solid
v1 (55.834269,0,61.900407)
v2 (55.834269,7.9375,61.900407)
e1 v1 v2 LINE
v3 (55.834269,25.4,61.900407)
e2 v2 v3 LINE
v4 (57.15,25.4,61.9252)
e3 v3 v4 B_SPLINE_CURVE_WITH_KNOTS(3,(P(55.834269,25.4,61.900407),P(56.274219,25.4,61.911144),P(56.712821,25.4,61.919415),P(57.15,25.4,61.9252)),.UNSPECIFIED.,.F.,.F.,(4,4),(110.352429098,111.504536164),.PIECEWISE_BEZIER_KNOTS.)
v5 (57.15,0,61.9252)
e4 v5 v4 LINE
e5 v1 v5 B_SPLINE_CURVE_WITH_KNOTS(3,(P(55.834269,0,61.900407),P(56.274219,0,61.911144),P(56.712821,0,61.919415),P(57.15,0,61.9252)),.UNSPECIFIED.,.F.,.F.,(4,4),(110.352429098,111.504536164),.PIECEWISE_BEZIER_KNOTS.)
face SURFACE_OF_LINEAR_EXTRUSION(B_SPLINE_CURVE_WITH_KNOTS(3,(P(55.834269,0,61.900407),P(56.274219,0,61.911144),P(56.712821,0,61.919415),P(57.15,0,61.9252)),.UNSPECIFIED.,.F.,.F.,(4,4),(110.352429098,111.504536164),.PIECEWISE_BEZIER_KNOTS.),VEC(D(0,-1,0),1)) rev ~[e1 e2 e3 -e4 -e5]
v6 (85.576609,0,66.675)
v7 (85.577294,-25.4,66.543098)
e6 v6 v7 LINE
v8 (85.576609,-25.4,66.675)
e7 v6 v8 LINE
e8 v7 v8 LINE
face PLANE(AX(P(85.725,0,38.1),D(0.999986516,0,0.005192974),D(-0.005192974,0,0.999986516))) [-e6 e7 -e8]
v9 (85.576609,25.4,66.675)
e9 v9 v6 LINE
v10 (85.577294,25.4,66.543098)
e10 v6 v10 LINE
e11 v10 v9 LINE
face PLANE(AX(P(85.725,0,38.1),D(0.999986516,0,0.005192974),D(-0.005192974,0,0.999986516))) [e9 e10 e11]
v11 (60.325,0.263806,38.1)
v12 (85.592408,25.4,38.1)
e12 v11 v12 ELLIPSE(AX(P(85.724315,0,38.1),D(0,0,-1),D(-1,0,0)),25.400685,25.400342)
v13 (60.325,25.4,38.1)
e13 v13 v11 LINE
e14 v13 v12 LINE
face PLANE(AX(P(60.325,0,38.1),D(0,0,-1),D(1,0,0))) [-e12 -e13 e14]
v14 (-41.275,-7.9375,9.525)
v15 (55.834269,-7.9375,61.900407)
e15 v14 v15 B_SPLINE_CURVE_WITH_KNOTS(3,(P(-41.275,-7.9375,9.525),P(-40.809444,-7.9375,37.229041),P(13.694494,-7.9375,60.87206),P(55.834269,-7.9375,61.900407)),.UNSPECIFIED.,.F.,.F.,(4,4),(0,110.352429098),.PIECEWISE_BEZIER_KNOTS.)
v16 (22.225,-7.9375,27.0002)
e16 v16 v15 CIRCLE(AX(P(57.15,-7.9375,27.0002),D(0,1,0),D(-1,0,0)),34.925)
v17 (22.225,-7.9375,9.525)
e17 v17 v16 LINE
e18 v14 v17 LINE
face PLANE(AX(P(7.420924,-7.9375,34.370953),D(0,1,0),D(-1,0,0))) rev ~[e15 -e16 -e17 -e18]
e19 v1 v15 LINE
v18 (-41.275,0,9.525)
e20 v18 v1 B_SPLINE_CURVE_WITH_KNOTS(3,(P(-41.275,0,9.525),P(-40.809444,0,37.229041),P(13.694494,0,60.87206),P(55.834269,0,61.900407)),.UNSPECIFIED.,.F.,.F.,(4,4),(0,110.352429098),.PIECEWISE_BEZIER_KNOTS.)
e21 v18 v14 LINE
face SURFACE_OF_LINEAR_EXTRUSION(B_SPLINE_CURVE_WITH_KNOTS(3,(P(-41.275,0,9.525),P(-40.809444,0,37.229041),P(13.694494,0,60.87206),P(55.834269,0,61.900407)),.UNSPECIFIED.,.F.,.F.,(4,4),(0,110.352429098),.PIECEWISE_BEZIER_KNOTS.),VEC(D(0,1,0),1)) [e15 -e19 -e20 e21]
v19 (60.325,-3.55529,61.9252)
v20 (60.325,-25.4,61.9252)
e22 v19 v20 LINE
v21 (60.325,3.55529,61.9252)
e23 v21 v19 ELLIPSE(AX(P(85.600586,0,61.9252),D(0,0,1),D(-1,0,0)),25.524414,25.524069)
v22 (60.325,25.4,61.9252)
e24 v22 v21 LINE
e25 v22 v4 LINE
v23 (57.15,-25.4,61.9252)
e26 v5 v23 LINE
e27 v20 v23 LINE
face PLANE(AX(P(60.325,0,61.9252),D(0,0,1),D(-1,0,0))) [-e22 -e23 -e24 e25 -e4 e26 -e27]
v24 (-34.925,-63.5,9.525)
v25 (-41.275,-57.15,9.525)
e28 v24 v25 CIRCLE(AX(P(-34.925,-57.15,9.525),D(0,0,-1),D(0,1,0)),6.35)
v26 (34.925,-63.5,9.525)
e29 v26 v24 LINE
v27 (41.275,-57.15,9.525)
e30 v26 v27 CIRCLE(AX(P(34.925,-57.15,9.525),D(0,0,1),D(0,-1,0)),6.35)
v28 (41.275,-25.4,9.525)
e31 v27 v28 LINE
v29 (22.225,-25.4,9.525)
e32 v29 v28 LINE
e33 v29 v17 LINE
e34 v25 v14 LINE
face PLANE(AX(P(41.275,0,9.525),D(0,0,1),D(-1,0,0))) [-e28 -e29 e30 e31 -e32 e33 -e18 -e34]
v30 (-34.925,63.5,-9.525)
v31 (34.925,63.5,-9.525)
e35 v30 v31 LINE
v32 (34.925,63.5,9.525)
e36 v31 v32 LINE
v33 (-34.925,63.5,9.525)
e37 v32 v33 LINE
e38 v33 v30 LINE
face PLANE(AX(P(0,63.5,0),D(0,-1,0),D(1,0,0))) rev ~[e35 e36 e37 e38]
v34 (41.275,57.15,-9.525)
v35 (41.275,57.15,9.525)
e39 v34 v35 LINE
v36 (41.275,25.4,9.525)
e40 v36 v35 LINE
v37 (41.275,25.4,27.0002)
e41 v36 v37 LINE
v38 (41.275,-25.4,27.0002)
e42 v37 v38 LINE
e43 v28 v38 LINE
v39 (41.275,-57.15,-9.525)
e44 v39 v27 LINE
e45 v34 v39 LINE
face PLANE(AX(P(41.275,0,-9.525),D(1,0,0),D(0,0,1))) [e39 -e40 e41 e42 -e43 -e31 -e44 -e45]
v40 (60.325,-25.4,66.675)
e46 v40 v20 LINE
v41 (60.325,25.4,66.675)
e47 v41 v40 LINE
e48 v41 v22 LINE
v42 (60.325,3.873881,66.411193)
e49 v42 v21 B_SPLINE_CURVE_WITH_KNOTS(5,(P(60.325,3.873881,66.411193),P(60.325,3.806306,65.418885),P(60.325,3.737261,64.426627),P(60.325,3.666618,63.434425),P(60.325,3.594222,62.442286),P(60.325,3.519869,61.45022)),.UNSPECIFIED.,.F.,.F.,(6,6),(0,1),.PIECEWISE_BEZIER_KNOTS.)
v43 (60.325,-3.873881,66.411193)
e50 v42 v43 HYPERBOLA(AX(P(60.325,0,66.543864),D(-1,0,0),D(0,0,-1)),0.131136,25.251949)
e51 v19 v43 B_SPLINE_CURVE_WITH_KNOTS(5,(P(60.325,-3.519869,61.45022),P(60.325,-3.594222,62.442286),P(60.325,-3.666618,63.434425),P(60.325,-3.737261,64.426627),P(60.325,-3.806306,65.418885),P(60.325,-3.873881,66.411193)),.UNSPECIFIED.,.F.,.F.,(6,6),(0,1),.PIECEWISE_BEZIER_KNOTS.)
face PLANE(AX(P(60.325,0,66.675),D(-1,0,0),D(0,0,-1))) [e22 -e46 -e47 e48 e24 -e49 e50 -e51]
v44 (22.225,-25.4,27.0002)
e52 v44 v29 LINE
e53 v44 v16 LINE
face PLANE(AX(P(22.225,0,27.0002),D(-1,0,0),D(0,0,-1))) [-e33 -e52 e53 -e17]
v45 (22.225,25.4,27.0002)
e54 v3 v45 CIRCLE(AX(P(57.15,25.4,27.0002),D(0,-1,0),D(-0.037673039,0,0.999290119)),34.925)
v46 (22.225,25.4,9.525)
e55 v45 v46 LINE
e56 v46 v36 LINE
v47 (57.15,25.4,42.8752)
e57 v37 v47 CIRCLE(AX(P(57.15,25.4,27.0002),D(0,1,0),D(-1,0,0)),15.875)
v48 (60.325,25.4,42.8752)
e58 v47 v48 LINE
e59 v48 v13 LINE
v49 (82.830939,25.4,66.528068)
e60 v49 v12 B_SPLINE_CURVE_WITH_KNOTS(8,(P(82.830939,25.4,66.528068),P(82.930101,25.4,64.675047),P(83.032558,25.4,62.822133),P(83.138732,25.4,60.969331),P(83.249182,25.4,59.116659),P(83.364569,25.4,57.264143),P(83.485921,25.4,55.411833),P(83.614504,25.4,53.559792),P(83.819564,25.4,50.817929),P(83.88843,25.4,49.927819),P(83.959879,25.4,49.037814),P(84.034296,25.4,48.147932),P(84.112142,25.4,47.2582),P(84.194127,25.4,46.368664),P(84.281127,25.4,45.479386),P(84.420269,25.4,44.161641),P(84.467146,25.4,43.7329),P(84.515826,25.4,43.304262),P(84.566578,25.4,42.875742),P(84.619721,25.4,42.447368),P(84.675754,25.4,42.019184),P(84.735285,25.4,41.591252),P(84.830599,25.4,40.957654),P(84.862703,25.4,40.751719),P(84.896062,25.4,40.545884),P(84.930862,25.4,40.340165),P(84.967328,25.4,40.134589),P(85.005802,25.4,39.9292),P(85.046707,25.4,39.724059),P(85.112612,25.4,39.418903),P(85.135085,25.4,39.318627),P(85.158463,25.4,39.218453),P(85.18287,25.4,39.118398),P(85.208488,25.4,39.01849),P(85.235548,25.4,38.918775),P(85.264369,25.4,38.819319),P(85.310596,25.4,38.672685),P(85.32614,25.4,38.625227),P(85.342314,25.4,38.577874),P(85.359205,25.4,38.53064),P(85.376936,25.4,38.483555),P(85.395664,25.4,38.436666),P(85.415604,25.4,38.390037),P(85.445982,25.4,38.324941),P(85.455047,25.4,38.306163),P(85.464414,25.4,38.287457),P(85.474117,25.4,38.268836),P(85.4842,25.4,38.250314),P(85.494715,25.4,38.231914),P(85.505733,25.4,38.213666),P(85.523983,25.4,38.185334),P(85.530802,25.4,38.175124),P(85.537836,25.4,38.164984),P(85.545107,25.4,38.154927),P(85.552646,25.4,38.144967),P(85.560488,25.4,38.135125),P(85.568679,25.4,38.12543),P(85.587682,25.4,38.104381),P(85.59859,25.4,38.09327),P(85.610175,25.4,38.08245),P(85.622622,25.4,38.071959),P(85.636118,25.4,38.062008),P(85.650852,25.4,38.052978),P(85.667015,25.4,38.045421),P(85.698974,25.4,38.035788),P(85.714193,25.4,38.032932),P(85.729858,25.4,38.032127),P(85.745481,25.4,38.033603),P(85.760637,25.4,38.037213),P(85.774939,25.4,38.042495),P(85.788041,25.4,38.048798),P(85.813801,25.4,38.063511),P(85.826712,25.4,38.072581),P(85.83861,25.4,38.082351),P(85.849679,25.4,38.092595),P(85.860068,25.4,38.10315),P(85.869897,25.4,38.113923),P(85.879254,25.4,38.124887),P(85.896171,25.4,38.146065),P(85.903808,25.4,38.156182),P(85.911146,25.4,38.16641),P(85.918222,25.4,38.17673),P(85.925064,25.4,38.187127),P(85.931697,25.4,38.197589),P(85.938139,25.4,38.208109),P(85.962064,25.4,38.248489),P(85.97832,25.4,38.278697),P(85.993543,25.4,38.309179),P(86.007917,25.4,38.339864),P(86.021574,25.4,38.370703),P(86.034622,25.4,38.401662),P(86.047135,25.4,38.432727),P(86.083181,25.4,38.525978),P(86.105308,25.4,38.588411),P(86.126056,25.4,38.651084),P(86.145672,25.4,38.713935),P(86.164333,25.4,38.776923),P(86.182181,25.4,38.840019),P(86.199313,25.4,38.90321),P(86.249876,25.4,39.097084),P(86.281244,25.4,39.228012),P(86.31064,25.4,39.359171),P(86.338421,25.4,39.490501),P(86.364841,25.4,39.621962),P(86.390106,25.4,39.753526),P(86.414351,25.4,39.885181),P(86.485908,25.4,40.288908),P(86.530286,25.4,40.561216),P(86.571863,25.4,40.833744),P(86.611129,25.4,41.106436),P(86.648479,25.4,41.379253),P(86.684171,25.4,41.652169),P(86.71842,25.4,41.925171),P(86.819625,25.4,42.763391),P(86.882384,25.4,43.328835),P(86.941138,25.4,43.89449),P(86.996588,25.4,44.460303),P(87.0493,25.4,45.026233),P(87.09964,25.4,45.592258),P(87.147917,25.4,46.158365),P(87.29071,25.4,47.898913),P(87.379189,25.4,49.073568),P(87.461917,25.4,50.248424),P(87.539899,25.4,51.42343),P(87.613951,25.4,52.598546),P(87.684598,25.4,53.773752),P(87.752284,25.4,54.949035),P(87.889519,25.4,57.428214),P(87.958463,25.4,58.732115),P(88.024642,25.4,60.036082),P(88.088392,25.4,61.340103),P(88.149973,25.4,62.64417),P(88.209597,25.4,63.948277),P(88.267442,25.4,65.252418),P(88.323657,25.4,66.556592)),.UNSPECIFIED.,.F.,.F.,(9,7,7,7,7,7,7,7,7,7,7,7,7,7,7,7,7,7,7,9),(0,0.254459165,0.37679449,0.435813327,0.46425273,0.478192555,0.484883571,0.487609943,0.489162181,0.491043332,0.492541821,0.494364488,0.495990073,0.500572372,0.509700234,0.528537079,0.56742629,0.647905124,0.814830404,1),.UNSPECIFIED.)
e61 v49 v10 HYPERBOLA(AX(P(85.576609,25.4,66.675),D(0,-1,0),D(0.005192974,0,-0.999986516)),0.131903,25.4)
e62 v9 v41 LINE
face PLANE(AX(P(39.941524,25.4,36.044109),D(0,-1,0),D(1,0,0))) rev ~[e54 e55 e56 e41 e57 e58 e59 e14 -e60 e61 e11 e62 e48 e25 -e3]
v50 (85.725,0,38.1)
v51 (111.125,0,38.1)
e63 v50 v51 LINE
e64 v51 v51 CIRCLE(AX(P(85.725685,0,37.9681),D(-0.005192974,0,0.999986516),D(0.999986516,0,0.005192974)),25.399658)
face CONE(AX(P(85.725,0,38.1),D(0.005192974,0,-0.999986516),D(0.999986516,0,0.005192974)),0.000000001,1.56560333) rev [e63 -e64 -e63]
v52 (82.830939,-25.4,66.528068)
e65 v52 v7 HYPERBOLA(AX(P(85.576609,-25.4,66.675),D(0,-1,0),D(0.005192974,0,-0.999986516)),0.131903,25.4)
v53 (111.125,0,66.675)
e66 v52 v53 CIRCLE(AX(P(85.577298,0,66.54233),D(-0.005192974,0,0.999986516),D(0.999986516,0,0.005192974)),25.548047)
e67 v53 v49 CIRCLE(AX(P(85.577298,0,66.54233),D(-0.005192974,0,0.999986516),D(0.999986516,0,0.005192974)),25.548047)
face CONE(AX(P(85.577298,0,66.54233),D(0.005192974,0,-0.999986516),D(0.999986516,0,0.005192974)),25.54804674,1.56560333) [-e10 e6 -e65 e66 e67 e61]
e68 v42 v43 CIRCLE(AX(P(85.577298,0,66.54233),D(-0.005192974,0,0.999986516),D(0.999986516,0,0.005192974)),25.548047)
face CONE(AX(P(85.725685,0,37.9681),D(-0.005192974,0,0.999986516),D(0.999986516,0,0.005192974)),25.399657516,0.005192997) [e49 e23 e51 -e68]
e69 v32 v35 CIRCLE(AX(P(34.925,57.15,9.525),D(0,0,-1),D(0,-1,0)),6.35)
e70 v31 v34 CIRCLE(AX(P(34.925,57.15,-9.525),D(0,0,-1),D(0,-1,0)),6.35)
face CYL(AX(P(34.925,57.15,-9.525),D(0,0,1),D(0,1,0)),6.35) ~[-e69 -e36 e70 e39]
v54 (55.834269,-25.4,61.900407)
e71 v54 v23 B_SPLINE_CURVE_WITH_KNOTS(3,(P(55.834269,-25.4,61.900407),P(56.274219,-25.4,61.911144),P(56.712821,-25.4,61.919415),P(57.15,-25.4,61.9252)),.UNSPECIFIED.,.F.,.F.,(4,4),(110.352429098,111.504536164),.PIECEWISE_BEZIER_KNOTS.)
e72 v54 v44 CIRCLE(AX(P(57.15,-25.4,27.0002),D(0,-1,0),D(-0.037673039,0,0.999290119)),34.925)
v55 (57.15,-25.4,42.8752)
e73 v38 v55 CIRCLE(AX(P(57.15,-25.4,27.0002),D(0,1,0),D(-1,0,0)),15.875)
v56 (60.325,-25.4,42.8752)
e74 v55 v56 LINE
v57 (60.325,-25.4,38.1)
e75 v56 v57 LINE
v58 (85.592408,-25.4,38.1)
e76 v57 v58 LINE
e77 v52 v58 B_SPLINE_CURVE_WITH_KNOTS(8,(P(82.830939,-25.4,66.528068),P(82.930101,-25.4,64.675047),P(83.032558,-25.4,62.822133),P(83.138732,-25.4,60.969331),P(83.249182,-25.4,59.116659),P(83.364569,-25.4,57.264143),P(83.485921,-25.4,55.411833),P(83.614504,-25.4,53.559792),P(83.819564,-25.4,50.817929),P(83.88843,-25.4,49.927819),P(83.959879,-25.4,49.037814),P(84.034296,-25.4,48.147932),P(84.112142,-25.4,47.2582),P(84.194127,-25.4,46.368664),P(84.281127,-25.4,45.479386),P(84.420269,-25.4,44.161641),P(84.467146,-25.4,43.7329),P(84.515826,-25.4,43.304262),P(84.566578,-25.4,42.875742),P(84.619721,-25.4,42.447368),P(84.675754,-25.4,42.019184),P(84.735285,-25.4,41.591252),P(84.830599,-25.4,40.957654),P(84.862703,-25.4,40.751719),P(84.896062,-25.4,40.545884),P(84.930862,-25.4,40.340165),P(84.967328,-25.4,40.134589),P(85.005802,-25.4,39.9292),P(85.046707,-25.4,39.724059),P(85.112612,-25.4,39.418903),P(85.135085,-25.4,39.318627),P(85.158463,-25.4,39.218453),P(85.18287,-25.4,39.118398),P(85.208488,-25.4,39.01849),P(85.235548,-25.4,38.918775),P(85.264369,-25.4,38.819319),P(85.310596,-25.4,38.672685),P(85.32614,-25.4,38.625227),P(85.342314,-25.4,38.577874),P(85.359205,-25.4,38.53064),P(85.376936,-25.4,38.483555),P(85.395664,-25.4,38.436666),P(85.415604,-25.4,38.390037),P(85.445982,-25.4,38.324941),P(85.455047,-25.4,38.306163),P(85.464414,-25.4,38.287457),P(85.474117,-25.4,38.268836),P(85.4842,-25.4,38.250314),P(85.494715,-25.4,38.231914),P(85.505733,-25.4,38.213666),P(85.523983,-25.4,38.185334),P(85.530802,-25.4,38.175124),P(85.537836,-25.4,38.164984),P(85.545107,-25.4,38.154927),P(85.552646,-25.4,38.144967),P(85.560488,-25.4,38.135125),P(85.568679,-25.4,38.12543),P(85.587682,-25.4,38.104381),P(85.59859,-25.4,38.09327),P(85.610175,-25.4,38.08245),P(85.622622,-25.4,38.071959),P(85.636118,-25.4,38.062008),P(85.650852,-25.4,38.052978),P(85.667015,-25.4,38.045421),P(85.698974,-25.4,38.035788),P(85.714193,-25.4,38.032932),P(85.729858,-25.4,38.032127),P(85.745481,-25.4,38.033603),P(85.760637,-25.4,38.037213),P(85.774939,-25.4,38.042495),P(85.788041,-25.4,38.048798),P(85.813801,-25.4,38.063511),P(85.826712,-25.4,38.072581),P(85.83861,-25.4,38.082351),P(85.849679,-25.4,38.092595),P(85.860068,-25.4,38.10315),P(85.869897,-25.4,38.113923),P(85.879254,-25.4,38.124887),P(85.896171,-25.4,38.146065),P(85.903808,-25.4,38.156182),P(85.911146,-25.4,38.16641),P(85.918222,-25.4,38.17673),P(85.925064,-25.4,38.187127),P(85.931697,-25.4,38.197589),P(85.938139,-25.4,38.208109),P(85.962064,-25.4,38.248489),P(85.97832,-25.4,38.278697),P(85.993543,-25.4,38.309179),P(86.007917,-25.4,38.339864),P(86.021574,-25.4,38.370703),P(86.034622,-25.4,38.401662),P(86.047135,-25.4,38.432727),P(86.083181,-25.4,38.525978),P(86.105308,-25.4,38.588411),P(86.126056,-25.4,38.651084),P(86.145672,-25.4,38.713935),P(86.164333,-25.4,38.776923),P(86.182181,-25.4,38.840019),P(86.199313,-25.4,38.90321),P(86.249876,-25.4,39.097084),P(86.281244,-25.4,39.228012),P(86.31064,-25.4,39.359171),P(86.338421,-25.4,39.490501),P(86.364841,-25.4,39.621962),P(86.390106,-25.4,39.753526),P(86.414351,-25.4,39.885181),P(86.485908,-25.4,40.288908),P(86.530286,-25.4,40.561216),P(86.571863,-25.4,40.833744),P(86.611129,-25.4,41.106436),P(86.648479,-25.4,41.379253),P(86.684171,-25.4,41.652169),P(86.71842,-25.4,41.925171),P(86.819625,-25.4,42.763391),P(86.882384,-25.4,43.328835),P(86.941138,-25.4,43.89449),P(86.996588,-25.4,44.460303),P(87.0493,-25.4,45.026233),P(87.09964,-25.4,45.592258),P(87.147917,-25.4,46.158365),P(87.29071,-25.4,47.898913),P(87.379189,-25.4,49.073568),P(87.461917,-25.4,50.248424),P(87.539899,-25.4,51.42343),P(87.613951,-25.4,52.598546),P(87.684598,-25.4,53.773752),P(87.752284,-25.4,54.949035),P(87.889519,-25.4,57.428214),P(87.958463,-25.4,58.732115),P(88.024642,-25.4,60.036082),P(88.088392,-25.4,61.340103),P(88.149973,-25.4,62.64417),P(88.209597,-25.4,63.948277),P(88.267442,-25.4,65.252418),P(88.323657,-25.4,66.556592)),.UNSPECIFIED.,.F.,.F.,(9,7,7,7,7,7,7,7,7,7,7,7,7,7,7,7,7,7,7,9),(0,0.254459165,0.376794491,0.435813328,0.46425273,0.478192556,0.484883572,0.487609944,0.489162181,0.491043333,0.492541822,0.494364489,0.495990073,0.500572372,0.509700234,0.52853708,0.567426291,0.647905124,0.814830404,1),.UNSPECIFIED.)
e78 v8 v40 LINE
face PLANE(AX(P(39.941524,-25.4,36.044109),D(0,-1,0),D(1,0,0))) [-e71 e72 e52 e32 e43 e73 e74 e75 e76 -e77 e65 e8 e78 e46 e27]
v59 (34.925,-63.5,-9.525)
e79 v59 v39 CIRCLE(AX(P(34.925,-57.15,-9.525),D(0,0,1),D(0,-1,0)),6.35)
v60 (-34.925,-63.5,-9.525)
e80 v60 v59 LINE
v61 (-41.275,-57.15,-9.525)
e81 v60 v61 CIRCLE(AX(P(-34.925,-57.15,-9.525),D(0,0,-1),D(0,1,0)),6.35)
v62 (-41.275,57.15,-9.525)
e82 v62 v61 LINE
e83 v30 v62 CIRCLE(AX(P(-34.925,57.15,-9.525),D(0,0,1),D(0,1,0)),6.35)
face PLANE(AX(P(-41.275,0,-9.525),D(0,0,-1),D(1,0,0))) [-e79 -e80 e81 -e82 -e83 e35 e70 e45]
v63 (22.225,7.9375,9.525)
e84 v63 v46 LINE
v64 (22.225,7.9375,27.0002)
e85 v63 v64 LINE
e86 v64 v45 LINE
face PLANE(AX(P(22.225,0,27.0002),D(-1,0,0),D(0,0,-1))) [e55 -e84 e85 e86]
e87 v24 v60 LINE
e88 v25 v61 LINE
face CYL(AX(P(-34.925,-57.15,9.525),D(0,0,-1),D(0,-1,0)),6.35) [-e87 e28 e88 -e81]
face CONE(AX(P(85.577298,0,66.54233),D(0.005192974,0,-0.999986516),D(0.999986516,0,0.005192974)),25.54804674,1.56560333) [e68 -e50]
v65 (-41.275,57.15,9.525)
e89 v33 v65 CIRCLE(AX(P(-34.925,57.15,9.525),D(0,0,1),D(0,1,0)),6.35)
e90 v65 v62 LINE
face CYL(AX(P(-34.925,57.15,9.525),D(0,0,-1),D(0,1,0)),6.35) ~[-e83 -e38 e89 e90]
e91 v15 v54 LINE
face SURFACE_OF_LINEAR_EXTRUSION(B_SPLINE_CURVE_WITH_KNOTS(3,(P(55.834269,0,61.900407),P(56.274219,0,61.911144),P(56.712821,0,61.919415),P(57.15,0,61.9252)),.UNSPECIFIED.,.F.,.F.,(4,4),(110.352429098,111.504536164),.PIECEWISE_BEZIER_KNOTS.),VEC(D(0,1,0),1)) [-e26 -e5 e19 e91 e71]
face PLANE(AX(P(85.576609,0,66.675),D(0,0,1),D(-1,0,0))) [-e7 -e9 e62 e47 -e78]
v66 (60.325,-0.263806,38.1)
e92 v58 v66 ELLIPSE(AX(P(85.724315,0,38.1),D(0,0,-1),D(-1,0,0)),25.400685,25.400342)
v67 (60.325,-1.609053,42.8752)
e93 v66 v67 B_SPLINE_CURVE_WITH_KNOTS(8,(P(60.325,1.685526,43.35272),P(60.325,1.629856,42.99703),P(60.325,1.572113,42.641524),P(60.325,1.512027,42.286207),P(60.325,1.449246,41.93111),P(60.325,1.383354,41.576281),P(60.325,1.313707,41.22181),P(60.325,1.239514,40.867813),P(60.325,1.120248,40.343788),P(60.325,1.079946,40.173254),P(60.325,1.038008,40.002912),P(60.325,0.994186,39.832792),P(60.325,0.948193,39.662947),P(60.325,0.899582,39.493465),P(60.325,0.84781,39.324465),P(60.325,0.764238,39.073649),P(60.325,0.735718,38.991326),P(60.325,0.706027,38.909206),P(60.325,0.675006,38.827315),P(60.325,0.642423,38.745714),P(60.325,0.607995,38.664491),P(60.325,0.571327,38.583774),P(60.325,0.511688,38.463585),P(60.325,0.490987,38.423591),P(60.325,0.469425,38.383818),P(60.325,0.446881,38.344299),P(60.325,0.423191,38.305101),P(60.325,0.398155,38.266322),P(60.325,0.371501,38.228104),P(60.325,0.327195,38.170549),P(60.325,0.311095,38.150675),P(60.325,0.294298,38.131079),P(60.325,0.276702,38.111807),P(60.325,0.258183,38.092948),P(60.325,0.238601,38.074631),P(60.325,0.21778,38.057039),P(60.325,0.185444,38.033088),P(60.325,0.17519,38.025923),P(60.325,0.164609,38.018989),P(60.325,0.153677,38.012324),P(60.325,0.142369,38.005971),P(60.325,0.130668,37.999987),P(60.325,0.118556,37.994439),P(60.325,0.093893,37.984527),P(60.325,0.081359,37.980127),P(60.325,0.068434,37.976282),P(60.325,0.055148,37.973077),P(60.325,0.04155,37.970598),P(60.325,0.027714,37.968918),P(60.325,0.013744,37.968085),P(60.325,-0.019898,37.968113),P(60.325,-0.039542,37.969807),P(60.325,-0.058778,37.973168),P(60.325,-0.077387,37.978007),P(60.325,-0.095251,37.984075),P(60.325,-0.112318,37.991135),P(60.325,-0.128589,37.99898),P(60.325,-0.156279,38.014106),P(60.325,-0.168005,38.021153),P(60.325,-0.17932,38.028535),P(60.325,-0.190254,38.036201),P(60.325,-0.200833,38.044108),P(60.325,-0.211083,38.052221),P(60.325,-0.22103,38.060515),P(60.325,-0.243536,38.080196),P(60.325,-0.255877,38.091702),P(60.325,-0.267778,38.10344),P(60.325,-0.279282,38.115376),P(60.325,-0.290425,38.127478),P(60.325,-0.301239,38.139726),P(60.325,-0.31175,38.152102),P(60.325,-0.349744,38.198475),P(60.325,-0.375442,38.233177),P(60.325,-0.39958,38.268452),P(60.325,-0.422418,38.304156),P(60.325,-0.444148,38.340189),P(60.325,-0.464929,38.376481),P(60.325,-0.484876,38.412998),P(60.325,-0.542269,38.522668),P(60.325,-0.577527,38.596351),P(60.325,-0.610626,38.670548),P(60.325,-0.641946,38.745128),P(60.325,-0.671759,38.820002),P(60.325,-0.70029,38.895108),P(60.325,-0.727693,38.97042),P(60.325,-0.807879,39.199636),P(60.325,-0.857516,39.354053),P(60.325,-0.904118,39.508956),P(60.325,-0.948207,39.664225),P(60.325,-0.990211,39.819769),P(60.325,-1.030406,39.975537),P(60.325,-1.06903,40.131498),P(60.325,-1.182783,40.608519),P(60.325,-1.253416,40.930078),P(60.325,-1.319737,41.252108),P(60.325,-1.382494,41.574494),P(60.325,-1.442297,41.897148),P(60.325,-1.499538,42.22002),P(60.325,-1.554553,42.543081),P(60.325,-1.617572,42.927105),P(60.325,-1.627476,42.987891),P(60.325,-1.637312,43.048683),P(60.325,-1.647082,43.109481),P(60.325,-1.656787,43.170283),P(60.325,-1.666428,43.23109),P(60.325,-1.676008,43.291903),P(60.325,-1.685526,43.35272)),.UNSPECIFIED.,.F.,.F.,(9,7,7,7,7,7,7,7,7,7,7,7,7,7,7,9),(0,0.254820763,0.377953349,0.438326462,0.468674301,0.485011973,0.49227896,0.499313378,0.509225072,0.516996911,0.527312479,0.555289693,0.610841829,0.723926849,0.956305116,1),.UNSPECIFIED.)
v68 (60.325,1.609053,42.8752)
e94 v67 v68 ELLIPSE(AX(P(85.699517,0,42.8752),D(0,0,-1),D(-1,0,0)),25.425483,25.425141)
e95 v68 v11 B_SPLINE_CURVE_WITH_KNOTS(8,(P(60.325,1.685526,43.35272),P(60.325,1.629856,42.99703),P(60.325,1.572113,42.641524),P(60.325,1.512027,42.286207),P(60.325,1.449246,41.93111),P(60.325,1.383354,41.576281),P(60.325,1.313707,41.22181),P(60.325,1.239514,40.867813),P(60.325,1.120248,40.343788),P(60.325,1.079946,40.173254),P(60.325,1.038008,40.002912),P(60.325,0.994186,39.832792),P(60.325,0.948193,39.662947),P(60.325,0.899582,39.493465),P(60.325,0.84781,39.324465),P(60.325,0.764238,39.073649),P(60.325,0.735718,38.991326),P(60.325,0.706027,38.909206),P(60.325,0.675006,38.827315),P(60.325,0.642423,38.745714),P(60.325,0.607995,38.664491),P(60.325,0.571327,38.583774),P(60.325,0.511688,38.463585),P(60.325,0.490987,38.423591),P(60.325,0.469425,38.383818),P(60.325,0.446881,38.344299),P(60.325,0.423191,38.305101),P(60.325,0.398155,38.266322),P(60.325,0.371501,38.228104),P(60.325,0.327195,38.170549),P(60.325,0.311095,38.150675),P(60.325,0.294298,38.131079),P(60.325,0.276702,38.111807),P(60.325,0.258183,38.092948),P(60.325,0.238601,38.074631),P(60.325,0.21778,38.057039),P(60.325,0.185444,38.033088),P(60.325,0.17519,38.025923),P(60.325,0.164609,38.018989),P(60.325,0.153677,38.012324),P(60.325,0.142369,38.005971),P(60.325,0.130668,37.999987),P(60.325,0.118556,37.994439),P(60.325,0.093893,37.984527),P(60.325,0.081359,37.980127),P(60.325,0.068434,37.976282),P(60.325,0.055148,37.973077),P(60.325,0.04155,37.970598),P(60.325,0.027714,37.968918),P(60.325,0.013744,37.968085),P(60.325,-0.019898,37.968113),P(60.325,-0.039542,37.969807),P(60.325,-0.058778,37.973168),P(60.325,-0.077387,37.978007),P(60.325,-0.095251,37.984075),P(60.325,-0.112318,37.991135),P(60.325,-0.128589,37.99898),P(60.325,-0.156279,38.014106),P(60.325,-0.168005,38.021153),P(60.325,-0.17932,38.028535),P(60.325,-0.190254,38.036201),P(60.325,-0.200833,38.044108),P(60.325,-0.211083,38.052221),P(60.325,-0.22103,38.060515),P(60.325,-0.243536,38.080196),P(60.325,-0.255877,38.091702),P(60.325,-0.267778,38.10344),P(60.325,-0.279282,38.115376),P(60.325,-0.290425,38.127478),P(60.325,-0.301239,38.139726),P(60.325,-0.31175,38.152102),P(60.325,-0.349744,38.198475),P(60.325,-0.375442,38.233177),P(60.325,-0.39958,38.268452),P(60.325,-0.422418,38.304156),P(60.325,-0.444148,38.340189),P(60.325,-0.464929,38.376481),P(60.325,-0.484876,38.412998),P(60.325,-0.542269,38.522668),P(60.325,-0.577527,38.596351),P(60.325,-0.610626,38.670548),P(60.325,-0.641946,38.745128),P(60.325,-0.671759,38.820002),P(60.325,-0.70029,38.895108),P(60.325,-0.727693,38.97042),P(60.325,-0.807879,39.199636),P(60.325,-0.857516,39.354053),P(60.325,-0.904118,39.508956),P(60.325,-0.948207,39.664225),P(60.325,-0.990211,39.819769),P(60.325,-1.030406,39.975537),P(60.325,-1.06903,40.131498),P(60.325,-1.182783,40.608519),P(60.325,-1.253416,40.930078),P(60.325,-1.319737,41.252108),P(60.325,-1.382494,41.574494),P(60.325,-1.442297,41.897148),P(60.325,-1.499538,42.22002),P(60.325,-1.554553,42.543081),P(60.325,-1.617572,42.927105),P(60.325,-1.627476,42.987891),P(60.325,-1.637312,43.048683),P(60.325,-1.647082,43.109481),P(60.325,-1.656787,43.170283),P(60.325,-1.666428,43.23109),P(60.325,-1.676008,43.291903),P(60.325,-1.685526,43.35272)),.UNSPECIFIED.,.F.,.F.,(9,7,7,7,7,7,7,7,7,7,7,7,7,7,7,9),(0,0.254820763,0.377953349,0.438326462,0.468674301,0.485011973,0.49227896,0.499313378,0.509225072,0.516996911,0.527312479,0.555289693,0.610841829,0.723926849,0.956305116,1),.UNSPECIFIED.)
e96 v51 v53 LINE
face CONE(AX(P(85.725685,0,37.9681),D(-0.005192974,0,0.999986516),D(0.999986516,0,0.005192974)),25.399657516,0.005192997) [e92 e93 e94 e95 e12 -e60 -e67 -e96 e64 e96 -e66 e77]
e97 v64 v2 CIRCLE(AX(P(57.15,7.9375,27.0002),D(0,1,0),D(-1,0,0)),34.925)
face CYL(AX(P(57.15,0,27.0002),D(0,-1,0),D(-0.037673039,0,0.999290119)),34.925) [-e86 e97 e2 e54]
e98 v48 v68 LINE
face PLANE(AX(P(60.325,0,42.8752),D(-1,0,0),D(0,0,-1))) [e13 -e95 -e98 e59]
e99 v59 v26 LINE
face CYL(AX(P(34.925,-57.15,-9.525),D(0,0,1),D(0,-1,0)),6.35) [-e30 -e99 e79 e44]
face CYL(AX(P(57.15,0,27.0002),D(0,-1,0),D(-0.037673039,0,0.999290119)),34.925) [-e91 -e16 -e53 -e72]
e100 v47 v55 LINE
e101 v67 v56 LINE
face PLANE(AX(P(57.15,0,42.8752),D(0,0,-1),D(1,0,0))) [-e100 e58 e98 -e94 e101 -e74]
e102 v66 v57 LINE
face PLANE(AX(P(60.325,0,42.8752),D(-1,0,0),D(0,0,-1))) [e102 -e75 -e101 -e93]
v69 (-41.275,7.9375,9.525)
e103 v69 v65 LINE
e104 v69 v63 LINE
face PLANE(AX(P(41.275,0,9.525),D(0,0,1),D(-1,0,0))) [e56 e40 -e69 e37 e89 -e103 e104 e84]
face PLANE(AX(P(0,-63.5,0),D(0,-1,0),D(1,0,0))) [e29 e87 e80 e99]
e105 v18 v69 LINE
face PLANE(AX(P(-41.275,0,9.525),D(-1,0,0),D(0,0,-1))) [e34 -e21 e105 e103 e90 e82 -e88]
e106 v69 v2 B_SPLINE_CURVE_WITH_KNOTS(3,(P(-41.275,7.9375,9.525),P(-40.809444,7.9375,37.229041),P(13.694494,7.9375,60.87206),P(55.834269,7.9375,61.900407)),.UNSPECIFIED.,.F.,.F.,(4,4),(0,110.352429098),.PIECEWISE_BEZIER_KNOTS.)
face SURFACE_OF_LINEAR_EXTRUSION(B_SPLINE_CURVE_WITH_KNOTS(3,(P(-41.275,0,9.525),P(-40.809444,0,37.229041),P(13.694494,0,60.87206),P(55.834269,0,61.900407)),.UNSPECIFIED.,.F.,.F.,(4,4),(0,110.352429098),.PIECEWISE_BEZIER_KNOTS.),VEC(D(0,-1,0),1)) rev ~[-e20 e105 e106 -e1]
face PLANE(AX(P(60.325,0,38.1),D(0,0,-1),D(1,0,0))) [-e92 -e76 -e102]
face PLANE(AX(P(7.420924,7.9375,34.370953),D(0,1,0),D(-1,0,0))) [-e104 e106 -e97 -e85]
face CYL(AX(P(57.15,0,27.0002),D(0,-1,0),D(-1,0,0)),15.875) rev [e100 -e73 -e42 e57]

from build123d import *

# Parameters (mm, degrees)
F1_DEPTH = 63.5
F2_DEPTH = 25.4
F3_DEPTH = 7.9375
F5_R     = 6.35


with BuildPart() as f1:
    # F0 (on Front) → F1 (new body, symmetric)
    with BuildSketch(Plane.XZ):
        Polygon((-41.275, 9.525), (-41.275, -9.525), (41.275, -9.525), (41.275, 9.525), (22.225, 9.525), align=None)
    extrude(amount=F1_DEPTH, both=True)

    # F0 (on Front) → F2 (join, symmetric)
    with BuildSketch(Plane.XZ):
        with BuildLine():
            Line((22.225, 9.525), (41.275, 9.525))
            Line((41.275, 9.525), (41.275, 27.0002))
            ThreePointArc((41.275, 27.0002), (45.9246798487, 38.2255201513), (57.15, 42.8752))
            Line((57.15, 42.8752), (60.325, 42.8752))
            Line((60.325, 42.8752), (60.325, 61.9252))
            Line((60.325, 61.9252), (57.15, 61.9252))
            add(Edge.make_bspline(
                [(55.8342690967, 61.900407409), (56.274218932, 61.9111436169), (56.7128210879, 61.9194148517), (57.15, 61.9252)],
                knots=[110.352429098, 110.352429098, 110.352429098, 110.352429098, 111.5045361635, 111.5045361635, 111.5045361635, 111.5045361635], degree=3))
            ThreePointArc((55.8342690967, 61.900407409), (31.9934151086, 51.2262574919), (22.225, 27.0002))
            Line((22.225, 27.0002), (22.225, 9.525))
        make_face()
        Polygon((60.325, 66.675), (60.325, 61.9252), (60.325, 42.8752), (60.325, 38.1), (85.725, 38.1), (85.576608777, 66.675), align=None)
    extrude(amount=F2_DEPTH, both=True)

    # F0 (on Front) → F3 (join, symmetric)
    with BuildSketch(Plane.XZ):
        with BuildLine():
            add(Edge.make_bspline(
                [(-41.275, 9.525), (-40.8094440998, 37.2290406247), (13.6944936723, 60.8720597372), (55.8342690967, 61.900407409)],
                knots=[0, 0, 0, 0, 110.352429098, 110.352429098, 110.352429098, 110.352429098], degree=3))
            Line((-41.275, 9.525), (22.225, 9.525))
            Line((22.225, 9.525), (22.225, 27.0002))
            ThreePointArc((22.225, 27.0002), (31.9934151086, 51.2262574919), (55.8342690967, 61.900407409))
        make_face()
    extrude(amount=F3_DEPTH, both=True)

    # F0 (on Front) → F4 (revolve)
    with BuildSketch(Plane.XZ):
        Polygon((111.125, 66.675), (85.576608777, 66.675), (85.725, 38.1), (111.125, 38.1), align=None)
    revolve(axis=Axis((85.6508043885, 0, 52.3875), (-0.0051929737, 0, 0.9999865164)))

    # F5
    f5_edges = [f1.edges().sort_by_distance(p)[0] for p in [
        (-41.275, -63.5, 0),
        (41.275, -63.5, 0),
        (41.275, 63.5, 0),
        (-41.275, 63.5, 0),
    ]]
    fillet(f5_edges, radius=F5_R)


solid = f1.part
